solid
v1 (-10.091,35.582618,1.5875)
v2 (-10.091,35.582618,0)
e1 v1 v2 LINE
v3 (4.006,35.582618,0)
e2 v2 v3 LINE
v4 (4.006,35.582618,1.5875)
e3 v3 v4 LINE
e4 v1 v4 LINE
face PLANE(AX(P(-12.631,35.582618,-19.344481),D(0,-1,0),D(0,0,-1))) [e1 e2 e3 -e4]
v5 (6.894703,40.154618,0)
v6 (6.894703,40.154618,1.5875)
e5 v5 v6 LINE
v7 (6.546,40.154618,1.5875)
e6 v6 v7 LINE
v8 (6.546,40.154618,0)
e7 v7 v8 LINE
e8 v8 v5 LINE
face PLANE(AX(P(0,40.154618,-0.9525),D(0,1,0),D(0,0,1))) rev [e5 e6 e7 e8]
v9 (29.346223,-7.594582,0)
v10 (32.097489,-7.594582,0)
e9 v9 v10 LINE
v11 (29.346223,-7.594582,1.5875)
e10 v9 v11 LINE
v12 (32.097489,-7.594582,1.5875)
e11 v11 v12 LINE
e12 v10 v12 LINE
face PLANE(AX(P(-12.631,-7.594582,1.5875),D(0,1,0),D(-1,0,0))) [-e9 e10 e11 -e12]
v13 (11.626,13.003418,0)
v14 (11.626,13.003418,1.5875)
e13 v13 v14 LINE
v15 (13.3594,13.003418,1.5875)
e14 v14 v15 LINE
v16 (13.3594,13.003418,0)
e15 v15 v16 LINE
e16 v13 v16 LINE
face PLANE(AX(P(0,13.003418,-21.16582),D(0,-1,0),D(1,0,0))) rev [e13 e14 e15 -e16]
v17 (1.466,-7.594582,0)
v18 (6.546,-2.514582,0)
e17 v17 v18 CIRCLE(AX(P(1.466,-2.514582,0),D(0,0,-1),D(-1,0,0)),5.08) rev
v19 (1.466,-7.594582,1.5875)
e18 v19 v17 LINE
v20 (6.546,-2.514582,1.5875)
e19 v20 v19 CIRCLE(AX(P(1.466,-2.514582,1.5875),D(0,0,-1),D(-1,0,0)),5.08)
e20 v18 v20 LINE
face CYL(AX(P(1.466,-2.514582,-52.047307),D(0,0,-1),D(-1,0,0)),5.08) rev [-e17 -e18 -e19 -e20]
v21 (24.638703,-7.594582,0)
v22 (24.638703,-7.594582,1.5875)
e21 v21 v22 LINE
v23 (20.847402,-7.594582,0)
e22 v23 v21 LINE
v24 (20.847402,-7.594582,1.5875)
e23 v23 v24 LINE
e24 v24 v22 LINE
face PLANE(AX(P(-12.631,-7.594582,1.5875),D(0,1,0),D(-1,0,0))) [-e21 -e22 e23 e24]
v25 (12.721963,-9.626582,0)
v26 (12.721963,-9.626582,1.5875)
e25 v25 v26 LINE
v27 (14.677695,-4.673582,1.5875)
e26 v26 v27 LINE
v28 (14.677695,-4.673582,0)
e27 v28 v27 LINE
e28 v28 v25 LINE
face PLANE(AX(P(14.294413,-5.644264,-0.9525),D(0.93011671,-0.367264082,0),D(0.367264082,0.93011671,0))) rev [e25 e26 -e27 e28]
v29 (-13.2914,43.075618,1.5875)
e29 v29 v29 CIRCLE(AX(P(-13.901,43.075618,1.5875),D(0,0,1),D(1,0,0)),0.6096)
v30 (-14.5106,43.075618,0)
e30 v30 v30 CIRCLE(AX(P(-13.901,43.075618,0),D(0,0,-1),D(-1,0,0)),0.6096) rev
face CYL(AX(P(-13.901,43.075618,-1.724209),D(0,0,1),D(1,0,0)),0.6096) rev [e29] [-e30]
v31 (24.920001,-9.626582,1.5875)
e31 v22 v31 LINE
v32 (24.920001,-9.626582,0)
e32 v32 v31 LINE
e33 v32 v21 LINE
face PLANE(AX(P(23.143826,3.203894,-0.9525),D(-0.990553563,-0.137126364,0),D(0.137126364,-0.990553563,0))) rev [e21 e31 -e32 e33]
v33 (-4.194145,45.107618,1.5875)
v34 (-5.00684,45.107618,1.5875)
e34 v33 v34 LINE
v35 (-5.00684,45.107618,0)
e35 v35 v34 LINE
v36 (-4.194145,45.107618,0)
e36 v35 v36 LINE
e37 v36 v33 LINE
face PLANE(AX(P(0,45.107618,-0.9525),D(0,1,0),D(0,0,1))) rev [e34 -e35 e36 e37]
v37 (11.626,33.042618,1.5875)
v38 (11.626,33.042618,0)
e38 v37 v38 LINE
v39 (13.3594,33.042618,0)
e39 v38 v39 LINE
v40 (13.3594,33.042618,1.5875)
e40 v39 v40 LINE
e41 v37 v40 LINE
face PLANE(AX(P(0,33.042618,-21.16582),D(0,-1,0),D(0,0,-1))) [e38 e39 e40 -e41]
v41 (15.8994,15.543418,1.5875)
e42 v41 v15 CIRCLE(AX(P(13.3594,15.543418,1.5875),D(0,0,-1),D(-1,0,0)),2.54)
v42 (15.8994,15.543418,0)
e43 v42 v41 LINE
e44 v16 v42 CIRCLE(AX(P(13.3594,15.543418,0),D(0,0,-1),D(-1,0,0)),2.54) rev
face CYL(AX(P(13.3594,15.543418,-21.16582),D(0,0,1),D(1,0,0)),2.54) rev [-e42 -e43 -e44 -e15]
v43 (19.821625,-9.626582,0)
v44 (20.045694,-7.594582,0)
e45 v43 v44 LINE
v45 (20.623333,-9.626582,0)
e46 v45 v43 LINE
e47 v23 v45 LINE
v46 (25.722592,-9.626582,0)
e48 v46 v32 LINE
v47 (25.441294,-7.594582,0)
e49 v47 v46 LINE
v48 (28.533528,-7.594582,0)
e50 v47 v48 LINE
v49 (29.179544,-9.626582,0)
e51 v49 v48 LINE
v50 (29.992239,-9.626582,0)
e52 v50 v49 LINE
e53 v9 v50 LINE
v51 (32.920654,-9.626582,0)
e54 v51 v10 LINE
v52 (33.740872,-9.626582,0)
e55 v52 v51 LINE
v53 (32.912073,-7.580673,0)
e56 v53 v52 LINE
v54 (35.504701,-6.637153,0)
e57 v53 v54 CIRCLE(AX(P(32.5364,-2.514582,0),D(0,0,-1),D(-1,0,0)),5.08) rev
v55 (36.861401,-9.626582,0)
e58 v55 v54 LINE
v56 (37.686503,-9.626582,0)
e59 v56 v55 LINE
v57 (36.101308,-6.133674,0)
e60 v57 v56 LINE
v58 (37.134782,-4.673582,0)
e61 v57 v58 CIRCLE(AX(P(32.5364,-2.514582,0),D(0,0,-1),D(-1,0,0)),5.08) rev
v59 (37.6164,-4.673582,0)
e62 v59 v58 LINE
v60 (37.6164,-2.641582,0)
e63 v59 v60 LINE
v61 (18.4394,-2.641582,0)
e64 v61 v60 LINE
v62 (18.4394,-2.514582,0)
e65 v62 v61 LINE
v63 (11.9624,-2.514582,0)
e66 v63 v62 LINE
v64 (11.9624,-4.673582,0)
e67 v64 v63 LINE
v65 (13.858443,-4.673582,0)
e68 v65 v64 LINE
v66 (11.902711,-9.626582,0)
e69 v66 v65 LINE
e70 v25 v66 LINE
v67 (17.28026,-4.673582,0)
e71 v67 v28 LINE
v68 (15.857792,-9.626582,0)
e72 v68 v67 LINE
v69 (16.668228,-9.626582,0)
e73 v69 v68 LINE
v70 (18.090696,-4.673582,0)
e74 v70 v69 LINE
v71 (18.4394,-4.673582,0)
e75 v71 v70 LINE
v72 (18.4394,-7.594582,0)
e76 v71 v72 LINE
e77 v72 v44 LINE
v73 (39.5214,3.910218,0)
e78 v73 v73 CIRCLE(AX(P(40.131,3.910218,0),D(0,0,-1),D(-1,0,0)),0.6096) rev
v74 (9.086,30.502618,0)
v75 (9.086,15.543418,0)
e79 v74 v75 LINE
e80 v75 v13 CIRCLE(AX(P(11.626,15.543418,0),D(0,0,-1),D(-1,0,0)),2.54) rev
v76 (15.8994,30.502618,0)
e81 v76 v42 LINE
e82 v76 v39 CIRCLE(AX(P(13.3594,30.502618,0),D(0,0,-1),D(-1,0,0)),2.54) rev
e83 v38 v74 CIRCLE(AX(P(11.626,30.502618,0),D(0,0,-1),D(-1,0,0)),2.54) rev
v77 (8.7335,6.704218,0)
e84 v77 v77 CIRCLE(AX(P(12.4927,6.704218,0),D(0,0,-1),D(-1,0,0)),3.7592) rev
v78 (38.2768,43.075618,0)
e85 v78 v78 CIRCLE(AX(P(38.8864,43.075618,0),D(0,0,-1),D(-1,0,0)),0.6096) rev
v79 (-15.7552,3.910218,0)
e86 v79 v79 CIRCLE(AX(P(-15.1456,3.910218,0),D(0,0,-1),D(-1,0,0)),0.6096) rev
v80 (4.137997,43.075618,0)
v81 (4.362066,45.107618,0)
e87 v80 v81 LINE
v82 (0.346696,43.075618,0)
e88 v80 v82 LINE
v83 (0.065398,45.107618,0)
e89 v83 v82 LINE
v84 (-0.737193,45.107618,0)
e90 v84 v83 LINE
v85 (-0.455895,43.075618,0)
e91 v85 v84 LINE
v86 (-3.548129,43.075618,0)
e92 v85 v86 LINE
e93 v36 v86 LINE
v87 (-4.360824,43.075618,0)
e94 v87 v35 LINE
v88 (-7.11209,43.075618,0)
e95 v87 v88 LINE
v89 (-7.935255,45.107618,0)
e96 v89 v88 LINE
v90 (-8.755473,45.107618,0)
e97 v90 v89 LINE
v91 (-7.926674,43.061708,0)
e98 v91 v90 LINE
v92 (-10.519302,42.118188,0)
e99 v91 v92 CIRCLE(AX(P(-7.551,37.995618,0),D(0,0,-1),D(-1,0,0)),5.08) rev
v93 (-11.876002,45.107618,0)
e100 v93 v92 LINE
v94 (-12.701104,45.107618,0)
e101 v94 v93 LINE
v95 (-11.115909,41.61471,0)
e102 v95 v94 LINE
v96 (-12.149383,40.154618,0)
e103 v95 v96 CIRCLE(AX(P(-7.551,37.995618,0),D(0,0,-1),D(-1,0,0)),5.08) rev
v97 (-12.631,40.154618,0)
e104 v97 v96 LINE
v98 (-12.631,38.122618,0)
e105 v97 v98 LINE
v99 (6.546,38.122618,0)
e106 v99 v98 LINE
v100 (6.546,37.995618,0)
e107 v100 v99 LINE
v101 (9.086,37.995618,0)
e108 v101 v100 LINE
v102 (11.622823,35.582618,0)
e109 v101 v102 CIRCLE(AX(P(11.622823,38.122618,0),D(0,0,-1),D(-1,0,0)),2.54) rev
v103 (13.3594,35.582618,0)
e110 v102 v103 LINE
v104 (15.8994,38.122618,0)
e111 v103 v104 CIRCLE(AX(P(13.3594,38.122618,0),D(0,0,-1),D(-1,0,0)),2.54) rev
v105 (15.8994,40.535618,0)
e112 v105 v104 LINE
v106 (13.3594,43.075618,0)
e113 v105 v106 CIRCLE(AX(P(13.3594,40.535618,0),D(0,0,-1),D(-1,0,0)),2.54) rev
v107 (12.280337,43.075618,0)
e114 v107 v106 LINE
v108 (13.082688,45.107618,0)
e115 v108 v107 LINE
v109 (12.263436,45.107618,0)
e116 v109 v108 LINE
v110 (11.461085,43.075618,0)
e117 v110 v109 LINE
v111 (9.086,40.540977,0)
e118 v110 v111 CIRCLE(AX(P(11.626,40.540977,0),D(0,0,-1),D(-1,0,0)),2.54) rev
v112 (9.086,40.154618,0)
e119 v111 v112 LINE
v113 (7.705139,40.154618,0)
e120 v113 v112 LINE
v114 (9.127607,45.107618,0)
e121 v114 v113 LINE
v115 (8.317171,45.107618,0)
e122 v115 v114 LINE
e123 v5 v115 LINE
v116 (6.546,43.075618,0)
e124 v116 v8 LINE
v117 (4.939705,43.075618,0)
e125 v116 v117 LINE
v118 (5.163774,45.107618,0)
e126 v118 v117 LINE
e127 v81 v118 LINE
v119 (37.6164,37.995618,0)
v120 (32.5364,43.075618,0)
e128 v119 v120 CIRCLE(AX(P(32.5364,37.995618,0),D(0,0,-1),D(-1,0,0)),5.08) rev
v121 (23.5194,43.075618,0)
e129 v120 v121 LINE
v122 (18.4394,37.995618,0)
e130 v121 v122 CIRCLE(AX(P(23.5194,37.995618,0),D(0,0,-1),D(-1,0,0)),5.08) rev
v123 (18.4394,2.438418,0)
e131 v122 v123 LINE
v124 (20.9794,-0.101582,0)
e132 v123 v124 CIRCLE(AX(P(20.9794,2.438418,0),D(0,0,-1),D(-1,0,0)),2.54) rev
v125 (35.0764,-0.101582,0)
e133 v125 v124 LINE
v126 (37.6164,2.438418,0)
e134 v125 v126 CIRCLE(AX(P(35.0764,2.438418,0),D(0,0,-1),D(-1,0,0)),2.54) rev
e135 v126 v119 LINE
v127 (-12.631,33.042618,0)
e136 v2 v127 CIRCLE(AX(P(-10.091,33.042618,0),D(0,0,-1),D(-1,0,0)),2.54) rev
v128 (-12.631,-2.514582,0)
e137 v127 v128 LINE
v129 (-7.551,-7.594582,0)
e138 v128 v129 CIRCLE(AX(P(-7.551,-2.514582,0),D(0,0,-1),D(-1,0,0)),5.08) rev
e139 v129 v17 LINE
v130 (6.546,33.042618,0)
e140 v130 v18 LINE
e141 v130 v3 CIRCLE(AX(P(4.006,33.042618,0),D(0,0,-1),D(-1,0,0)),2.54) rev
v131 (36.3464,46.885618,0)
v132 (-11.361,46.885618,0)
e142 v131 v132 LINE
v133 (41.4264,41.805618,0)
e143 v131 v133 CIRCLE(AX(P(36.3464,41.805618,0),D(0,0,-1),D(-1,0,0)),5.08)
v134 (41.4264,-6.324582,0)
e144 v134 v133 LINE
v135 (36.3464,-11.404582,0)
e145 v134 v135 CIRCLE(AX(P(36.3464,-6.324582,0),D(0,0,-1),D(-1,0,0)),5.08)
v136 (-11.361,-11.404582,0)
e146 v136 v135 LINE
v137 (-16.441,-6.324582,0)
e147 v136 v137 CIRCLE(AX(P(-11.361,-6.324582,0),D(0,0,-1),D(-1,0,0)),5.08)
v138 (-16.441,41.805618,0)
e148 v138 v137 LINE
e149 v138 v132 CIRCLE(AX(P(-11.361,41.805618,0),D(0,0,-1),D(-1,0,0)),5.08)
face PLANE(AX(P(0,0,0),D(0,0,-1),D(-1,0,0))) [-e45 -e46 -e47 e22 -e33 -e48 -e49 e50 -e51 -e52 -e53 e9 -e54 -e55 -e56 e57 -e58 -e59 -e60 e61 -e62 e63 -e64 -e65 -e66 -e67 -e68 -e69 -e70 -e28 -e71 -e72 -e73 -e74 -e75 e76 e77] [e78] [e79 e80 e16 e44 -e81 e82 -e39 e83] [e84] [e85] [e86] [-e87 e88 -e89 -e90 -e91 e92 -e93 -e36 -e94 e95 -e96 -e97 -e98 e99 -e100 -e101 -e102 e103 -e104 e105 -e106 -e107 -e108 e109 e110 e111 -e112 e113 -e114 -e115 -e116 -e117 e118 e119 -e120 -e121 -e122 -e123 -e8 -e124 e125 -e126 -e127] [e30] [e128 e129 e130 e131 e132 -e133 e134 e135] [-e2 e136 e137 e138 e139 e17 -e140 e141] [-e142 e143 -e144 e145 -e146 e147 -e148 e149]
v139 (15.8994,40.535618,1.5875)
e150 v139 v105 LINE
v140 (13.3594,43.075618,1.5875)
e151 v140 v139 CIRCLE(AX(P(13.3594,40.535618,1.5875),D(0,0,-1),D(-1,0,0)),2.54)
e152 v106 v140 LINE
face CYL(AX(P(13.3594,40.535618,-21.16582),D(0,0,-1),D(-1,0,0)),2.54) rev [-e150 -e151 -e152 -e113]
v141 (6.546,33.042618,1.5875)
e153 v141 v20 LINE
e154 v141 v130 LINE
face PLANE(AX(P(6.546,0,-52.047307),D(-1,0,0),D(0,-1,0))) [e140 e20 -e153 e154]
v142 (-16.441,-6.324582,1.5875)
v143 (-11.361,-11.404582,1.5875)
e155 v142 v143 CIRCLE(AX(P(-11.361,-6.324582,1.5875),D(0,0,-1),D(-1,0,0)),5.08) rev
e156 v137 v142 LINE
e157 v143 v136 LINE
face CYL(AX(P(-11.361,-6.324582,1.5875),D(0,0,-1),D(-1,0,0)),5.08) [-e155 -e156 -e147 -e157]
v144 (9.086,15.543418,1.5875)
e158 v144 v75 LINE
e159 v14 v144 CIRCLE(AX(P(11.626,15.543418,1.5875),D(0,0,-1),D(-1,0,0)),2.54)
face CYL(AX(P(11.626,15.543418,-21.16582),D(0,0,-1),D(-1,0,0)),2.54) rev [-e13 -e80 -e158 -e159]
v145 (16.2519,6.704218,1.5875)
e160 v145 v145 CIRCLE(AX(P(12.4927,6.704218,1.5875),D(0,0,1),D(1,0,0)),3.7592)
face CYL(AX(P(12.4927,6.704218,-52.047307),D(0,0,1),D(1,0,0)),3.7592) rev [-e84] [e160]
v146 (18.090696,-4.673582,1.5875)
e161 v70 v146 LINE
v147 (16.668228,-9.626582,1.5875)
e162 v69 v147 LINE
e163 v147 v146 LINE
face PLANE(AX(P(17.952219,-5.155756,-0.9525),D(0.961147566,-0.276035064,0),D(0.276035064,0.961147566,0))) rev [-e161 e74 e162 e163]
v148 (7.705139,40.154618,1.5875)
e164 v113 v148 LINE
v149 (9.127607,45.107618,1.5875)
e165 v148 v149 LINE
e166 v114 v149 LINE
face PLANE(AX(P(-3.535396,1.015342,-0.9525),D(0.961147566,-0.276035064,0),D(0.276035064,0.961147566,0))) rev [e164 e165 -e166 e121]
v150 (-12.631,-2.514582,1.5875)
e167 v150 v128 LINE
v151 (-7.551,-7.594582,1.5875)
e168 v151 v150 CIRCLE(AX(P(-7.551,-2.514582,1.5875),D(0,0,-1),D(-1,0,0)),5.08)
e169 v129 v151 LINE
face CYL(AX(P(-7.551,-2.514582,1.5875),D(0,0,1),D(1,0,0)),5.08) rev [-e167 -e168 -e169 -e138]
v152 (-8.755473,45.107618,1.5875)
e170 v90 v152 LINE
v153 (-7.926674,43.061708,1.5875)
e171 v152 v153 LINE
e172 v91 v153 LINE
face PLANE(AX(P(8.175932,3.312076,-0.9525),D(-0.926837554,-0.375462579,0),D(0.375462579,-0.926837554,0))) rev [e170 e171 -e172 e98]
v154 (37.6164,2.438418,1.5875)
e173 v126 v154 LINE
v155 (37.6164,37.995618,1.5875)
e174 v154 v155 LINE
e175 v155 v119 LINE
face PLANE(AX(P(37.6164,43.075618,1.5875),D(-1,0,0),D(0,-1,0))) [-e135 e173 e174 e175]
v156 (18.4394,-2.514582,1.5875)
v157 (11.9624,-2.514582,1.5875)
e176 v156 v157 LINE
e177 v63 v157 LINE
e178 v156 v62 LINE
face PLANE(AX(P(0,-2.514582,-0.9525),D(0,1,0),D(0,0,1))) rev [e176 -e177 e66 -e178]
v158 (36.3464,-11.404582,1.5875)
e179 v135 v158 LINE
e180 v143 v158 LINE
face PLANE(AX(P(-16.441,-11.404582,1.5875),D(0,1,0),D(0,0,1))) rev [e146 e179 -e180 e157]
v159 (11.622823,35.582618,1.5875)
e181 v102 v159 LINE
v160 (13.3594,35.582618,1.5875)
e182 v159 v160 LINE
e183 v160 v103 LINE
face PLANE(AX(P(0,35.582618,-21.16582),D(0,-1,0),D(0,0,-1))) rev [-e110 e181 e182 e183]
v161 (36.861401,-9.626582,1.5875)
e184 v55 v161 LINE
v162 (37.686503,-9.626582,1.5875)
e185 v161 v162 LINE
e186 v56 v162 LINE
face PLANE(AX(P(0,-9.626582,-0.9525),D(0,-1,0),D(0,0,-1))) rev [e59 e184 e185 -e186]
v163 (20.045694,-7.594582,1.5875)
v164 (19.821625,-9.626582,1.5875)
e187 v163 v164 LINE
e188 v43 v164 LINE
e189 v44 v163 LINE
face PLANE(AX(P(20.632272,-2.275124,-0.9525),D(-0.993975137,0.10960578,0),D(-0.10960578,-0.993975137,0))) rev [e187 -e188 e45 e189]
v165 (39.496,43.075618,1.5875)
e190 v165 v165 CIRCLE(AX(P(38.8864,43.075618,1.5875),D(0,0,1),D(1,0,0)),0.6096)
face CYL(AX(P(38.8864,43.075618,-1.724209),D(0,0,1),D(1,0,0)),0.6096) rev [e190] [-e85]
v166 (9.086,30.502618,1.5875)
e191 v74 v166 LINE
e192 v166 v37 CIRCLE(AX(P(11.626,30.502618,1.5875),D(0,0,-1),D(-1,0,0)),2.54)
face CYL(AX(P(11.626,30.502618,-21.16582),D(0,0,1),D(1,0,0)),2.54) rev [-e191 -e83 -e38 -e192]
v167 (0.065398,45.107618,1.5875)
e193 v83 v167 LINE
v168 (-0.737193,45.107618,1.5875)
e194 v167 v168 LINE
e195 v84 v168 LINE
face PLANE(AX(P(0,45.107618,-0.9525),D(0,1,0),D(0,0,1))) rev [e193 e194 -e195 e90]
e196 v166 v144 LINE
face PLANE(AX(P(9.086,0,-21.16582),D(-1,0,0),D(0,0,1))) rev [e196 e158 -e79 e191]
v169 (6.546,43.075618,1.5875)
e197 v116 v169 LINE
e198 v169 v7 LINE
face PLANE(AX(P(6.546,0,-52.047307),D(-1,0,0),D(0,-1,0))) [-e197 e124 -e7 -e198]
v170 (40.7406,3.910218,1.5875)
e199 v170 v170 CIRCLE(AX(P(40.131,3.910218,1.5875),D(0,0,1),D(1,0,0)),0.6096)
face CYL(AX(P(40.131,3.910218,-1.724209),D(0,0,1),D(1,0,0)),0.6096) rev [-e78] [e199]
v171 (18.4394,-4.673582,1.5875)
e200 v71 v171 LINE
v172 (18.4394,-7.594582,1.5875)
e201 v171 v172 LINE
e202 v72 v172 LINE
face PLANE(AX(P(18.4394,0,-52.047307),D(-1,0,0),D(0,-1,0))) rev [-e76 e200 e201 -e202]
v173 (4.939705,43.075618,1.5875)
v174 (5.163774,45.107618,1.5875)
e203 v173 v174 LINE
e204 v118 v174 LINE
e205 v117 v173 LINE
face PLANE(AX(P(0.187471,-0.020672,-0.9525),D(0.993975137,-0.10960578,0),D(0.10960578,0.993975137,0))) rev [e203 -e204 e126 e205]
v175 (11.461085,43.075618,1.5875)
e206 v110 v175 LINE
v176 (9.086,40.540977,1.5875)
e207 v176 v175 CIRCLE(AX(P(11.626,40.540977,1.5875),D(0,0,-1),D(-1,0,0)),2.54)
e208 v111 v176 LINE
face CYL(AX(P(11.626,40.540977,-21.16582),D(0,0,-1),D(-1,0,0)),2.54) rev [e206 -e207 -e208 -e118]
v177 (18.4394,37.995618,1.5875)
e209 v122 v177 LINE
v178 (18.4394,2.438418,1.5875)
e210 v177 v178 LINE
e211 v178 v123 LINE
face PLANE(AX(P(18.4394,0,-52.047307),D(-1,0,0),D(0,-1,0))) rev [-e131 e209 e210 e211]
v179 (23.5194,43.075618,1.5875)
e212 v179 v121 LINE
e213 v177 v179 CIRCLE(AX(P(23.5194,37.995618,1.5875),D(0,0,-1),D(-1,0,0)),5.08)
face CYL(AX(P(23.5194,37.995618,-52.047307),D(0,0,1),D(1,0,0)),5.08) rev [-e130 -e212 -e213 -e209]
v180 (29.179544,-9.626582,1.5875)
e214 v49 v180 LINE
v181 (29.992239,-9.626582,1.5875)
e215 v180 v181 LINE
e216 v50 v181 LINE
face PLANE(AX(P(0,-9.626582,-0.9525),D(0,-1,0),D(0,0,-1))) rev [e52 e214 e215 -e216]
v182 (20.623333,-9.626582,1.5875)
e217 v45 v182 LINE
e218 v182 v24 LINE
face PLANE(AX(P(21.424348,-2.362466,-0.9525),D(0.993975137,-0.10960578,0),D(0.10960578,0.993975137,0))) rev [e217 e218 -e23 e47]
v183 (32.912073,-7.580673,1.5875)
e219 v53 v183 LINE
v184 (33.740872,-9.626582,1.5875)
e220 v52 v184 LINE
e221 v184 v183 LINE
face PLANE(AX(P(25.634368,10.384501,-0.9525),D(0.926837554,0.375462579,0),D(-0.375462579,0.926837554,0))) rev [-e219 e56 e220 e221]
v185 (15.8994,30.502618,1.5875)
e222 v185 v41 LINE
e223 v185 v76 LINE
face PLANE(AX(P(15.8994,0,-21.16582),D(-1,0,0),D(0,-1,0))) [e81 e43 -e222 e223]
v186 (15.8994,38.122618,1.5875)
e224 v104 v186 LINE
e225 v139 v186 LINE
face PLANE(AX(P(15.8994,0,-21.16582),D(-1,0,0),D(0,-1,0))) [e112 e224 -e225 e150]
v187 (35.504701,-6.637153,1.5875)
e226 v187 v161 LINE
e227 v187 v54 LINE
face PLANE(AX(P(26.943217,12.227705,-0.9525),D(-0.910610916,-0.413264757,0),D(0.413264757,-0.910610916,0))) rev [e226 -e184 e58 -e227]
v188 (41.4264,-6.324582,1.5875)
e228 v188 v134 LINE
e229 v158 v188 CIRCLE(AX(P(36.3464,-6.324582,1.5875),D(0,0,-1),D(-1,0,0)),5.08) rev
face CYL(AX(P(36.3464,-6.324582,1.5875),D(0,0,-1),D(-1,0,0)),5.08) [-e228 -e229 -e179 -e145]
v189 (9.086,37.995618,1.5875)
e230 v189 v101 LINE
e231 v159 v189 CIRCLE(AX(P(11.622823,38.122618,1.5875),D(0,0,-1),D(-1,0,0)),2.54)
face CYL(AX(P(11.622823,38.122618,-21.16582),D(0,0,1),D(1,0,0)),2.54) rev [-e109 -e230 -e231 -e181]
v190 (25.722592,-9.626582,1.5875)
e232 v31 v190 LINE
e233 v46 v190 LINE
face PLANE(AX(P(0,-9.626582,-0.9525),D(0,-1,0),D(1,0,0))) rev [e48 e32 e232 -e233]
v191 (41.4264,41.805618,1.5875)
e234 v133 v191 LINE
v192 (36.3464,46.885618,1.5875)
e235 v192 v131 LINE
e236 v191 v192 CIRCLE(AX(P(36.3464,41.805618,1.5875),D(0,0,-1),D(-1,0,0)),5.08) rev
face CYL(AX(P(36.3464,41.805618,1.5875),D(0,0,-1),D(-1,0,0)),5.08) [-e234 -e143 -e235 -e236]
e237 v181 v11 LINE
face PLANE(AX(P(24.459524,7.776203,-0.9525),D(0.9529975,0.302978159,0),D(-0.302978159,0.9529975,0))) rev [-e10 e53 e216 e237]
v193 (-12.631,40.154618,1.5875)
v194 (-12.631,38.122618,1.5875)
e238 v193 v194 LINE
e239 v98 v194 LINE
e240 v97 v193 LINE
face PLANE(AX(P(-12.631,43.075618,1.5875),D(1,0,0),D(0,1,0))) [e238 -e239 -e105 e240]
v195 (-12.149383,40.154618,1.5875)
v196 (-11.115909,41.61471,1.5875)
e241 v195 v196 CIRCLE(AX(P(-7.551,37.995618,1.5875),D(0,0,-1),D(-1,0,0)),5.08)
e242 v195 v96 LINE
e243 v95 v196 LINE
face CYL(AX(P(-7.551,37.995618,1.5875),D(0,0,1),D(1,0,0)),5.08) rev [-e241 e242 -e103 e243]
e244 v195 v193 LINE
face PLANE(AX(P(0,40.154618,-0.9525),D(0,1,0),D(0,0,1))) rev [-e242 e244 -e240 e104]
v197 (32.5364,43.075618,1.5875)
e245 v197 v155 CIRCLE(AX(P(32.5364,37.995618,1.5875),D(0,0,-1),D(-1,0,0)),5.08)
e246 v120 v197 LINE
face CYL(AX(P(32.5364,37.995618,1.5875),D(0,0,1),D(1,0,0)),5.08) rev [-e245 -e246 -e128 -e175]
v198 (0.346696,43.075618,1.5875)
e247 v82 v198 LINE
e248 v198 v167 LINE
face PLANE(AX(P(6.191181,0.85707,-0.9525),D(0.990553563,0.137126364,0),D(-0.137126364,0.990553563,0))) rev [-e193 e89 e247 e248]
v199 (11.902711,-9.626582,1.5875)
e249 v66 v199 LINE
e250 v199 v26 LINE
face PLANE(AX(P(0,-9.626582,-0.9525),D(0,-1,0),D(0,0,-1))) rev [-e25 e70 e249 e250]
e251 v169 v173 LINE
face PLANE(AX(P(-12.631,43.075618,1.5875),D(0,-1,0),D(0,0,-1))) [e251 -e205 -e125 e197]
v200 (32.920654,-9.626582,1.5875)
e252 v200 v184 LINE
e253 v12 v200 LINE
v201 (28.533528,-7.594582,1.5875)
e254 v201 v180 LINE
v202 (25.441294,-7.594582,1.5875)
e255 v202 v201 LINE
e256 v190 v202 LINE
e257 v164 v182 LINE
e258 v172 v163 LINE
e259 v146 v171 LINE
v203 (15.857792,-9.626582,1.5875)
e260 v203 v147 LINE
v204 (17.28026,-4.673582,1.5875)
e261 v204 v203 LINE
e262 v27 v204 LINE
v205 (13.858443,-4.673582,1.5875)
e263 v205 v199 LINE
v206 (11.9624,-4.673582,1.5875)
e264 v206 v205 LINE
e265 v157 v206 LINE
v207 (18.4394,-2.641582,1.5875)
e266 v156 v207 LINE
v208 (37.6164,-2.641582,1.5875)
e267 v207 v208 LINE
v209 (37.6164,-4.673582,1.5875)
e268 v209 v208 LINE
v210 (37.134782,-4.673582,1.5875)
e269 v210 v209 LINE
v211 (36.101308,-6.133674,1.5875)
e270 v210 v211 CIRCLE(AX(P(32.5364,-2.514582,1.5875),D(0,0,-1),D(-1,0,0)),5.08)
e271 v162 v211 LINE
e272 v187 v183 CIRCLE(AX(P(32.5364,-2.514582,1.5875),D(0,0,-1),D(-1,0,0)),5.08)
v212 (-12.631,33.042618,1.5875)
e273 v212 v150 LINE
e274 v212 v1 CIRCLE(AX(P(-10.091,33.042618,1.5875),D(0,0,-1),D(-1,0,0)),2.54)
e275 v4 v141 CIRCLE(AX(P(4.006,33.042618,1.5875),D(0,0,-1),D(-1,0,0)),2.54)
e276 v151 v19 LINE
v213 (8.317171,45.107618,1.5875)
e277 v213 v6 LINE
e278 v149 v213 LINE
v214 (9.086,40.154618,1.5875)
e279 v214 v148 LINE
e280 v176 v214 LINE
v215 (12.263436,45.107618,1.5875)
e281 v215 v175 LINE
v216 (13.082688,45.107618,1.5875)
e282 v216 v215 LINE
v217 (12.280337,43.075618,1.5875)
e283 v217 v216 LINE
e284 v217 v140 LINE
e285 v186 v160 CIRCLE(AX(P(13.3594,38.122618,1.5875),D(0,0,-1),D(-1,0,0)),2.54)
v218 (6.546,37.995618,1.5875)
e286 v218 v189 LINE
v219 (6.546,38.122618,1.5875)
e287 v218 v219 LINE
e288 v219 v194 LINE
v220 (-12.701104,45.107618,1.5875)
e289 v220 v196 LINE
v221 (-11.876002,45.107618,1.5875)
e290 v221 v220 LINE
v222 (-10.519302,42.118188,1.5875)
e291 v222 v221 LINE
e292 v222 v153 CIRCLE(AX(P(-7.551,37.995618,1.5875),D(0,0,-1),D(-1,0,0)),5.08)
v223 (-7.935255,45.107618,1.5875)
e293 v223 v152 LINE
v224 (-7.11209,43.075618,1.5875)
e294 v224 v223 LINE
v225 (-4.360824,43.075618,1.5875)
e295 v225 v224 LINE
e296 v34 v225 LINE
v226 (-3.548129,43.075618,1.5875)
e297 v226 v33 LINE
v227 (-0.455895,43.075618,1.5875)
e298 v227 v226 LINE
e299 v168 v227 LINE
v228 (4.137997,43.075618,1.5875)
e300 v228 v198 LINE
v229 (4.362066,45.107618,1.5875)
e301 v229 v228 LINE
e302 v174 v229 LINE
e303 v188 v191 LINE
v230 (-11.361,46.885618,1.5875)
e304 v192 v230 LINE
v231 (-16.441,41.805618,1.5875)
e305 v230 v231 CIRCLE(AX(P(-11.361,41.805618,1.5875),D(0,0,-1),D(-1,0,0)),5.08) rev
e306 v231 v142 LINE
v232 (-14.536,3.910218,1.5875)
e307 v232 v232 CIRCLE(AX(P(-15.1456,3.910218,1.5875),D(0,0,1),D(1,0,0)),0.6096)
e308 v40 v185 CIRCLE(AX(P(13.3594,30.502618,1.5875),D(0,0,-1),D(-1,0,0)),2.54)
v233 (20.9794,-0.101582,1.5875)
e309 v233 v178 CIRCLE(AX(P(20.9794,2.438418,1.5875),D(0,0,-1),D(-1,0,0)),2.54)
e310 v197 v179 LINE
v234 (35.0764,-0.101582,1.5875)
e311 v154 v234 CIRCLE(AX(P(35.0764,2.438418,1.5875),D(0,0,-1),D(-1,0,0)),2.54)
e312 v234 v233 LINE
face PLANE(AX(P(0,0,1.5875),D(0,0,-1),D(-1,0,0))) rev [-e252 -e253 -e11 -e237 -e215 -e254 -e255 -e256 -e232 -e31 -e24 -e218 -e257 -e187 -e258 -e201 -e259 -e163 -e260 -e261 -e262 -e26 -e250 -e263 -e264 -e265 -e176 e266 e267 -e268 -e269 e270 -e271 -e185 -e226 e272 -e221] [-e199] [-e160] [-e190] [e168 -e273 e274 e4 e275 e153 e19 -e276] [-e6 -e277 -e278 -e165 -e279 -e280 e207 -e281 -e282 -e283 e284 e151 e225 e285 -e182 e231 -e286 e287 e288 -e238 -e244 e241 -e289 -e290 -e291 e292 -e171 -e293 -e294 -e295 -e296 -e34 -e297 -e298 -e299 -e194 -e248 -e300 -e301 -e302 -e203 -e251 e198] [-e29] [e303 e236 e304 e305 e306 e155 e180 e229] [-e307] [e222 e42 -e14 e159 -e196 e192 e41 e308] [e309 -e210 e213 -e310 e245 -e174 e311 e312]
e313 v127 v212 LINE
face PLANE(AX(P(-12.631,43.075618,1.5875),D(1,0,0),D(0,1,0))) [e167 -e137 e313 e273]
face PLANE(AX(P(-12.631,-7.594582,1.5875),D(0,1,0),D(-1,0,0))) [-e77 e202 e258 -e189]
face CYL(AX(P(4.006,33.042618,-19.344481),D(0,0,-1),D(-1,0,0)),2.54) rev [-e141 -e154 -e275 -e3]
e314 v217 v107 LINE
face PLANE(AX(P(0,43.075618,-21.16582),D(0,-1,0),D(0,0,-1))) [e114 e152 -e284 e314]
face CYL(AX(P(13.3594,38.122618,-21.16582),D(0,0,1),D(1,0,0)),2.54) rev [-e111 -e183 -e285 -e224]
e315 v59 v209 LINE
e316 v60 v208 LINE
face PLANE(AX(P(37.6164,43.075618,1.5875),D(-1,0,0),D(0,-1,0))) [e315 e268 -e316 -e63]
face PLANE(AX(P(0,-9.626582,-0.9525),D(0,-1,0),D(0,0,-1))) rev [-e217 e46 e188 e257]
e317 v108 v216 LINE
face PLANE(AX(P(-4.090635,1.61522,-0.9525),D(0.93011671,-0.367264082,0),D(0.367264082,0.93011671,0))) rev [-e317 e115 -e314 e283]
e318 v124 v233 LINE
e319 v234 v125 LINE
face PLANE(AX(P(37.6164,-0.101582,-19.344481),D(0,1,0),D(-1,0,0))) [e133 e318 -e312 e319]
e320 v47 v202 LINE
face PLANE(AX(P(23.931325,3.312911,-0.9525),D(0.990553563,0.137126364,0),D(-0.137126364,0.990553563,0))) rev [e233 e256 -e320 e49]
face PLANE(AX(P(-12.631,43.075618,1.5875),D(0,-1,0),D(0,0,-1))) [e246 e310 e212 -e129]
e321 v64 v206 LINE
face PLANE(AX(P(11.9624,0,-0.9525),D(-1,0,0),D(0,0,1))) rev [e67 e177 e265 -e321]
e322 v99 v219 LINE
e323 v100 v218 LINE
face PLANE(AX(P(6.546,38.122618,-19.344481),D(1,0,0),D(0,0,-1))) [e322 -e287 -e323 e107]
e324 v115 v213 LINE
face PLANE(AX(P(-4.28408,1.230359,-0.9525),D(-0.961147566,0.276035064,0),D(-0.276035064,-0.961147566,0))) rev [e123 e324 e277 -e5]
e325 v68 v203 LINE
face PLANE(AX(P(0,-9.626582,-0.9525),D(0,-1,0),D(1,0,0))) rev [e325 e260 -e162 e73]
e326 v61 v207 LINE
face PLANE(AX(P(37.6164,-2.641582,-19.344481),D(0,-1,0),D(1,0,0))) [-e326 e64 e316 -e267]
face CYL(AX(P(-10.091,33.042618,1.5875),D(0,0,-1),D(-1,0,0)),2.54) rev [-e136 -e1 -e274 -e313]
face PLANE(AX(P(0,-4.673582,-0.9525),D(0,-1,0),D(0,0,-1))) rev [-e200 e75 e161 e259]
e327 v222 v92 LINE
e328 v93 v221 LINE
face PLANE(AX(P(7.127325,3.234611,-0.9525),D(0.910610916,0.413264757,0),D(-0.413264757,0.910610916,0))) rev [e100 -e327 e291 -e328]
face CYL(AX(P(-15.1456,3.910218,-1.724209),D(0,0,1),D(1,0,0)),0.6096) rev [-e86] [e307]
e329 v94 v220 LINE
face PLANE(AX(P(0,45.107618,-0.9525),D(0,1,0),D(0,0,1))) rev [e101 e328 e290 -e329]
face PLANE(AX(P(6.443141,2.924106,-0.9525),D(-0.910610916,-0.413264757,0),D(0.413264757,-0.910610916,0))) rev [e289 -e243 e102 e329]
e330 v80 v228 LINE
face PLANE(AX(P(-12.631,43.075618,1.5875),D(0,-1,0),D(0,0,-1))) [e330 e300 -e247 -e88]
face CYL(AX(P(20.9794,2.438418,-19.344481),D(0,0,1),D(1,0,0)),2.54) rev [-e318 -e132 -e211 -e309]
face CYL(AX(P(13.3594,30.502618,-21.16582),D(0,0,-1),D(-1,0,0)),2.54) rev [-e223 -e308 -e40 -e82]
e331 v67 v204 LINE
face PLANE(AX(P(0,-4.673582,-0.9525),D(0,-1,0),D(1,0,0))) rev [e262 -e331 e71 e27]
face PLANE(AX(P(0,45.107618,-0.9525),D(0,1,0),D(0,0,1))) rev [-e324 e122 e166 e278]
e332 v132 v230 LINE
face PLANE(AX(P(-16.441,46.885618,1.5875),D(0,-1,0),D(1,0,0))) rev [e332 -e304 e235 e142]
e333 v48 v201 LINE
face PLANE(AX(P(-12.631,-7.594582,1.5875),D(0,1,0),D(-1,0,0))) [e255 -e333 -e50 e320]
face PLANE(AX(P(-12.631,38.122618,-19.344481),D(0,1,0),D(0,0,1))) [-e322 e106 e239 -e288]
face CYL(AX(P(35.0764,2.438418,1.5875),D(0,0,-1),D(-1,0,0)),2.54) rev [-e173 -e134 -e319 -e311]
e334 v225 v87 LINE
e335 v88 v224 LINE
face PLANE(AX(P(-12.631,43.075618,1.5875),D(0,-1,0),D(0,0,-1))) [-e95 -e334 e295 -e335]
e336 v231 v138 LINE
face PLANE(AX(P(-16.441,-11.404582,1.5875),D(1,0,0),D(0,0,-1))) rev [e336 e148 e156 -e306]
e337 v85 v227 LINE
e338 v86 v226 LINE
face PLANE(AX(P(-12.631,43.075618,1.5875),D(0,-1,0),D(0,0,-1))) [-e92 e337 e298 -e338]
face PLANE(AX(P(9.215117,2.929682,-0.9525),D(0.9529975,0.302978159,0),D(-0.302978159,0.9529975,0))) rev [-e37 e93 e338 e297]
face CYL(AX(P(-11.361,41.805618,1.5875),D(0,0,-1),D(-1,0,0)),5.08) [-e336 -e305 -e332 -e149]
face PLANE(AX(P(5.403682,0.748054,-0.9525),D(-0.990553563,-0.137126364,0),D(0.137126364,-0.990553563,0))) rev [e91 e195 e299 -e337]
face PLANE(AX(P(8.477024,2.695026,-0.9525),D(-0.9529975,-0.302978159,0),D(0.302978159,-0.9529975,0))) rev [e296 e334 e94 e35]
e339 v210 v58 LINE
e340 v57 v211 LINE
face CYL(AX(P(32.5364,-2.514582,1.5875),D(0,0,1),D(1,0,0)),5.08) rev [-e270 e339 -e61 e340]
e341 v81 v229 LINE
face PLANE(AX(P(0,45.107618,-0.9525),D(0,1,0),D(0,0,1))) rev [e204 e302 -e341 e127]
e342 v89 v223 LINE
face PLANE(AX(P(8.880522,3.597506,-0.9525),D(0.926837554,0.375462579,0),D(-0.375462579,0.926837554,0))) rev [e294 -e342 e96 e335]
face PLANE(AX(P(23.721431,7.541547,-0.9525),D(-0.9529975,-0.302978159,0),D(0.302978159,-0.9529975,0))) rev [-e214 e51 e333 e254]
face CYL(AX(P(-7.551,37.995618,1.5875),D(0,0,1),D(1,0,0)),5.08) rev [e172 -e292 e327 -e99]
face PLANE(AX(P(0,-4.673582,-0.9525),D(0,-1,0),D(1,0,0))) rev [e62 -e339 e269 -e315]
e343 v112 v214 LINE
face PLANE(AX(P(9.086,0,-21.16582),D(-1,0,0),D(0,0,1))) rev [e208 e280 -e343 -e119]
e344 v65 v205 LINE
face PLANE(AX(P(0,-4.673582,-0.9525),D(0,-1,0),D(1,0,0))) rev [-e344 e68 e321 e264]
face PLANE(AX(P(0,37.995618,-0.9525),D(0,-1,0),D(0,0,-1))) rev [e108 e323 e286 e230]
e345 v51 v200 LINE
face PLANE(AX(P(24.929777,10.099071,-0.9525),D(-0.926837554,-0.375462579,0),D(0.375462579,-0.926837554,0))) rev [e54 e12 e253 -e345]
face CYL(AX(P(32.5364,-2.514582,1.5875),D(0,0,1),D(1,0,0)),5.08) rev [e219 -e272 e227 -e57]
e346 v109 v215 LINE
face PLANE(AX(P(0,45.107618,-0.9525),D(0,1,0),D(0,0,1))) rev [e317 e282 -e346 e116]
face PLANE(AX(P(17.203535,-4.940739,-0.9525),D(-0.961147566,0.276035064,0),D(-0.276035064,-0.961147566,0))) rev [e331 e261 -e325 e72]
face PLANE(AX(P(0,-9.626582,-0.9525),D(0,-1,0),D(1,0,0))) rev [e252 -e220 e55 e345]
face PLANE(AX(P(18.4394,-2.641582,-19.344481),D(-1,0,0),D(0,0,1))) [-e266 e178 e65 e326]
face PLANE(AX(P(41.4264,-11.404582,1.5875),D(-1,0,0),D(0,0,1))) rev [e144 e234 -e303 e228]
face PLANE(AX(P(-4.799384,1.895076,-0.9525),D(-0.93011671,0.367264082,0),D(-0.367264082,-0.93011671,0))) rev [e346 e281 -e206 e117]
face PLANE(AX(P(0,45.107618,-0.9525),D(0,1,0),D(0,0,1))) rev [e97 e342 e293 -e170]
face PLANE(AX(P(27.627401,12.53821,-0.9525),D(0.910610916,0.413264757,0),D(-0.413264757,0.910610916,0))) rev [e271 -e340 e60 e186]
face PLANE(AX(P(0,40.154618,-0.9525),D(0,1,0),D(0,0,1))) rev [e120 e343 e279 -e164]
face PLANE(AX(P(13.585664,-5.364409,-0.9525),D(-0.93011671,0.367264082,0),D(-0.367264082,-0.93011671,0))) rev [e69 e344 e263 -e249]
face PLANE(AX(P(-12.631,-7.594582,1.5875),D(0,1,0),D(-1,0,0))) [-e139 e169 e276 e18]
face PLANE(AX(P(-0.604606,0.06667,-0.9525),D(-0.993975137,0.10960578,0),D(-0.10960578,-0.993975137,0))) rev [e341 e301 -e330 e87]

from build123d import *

# Parameters (mm, degrees)
SKETCH1_W           = 57.8674
SKETCH1_H           = 58.2902
SKETCH1_W_2         = 50.2474
SKETCH1_H_2         = 50.6702
BOSS_EXTRUDE1_DEPTH = 1.5875
FILLET3_R           = 5.08
SKETCH6_W           = 11.8934
SKETCH6_H           = 50.6702
SKETCH6_R           = 3.7592
BOSS_EXTRUDE2_DEPTH = 1.5875
FINS_CUT_DEPTH      = 2.54
SKETCH7_W           = 19.177
SKETCH7_H           = 2.54
BOSS_EXTRUDE3_DEPTH = 1.5875
FILLET1_R           = 5.08
FILLET4_R           = 5.08
SKETCH8_W           = 6.8134
SKETCH8_H           = 7.493
SKETCH8_H_2         = 20.0392
CUT_EXTRUDE5_DEPTH  = 1.5875
FILLET5_R           = 2.54
FILLET6_R           = 2.54
FILLET7_R           = 2.54
SKETCH9_R           = 0.6096
CUT_EXTRUDE6_DEPTH  = 1.5875


with BuildPart() as part:
    # Sketch1 → Boss-Extrude1 (new body)
    with BuildSketch(Plane.XY):
        with Locations((12.492699517, 17.740517652)):
            Rectangle(SKETCH1_W, SKETCH1_H)
        with Locations((12.492699517, 17.740517652)):
            Rectangle(SKETCH1_W_2, SKETCH1_H_2, mode=Mode.SUBTRACT)
    extrude(amount=BOSS_EXTRUDE1_DEPTH)

    # Fillet3
    fillet3_edges = [part.edges().sort_by_distance(p)[0] for p in [
        (-12.631000483, 43.075617652, 0.79375),
        (-12.631000483, -7.594582348, 0.79375),
        (37.616399517, -7.594582348, 0.79375),
        (37.616399517, 43.075617652, 0.79375),
    ]]
    fillet(fillet3_edges, radius=FILLET3_R)

    # Sketch6 → Boss-Extrude2 (add)
    with BuildSketch(Plane.XY.offset(1.5875)):
        with Locations((12.492699517, 17.740517652)):
            Rectangle(SKETCH6_W, SKETCH6_H)
        with Locations((12.492699517, 6.704217652)):
            Circle(SKETCH6_R, mode=Mode.SUBTRACT)
    extrude(amount=-BOSS_EXTRUDE2_DEPTH)

    # Sketch4 → Fins cut (cut)
    with BuildSketch(Plane.XY.offset(1.5875)):
        with BuildLine():
            Line((-12.149382698, 40.154617652), (-12.631000483, 40.154617652))
            Line((-12.631000483, 40.154617652), (-12.631000483, 37.995617652))
            ThreePointArc((-12.631000483, 37.995617652), (-12.509134288, 39.101650731), (-12.149382698, 40.154617652))
        make_face()
        Polygon((6.545999517, 40.154617652), (6.545999517, 37.995617652), (13.022999517, 37.995617652), (13.022999517, 40.154617652), (11.126956513, 40.154617652), (13.082688495, 45.107617652), (12.263436468, 45.107617652), (10.307704486, 40.154617652), (7.705138754, 40.154617652), (9.127606772, 45.107617652), (8.317171321, 45.107617652), (6.894703303, 40.154617652), align=None)
        with BuildLine():
            Line((-12.701104011, 45.107617652), (-11.115909096, 41.614709607))
            ThreePointArc((-11.115909096, 41.614709607), (-10.827291356, 41.877926001), (-10.5193022, 42.118187835))
            Line((-10.5193022, 42.118187835), (-11.876002372, 45.107617652))
            Line((-11.876002372, 45.107617652), (-12.701104011, 45.107617652))
        make_face()
        Polygon((4.93970469, 43.075617652), (5.163773621, 45.107617652), (4.362066012, 45.107617652), (4.137997081, 43.075617652), align=None)
        Polygon((18.439399517, -2.514582348), (11.962399517, -2.514582348), (11.962399517, -4.673582348), (13.858442521, -4.673582348), (11.902710539, -9.626582348), (12.721962566, -9.626582348), (14.677694548, -4.673582348), (17.28026028, -4.673582348), (15.857792262, -9.626582348), (16.668227713, -9.626582348), (18.090695731, -4.673582348), (18.439399517, -4.673582348), align=None)
        with BuildLine():
            Line((-8.755473368, 45.107617652), (-7.926673781, 43.061707818))
            ThreePointArc((-7.926673781, 43.061707818), (-7.738965845, 43.072139003), (-7.551000483, 43.075617652))
            Line((-7.551000483, 43.075617652), (-7.112090465, 43.075617652))
            Line((-7.112090465, 43.075617652), (-7.935255168, 45.107617652))
            Line((-7.935255168, 45.107617652), (-8.755473368, 45.107617652))
        make_face()
        with BuildLine():
            Line((37.616399517, -4.673582348), (37.616399517, -2.514582348))
            ThreePointArc((37.616399517, -2.514582348), (37.494533322, -3.620615427), (37.134781733, -4.673582348))
            Line((37.134781733, -4.673582348), (37.616399517, -4.673582348))
        make_face()
        Polygon((0.346695583, 43.075617652), (0.065397546, 45.107617652), (-0.737192749, 45.107617652), (-0.455894712, 43.075617652), align=None)
        with BuildLine():
            Line((37.686503045, -9.626582348), (36.10130813, -6.133674303))
            ThreePointArc((36.10130813, -6.133674303), (35.81269039, -6.396890696), (35.504701234, -6.637152531))
            Line((35.504701234, -6.637152531), (36.861401406, -9.626582348))
            Line((36.861401406, -9.626582348), (37.686503045, -9.626582348))
        make_face()
        Polygon((20.045694344, -7.594582348), (19.821625413, -9.626582348), (20.623333022, -9.626582348), (20.847401953, -7.594582348), align=None)
        Polygon((-5.00684021, 45.107617652), (-4.360824225, 43.075617652), (-3.54812875, 43.075617652), (-4.194144736, 45.107617652), align=None)
        Polygon((24.638703451, -7.594582348), (24.920001488, -9.626582348), (25.722591783, -9.626582348), (25.441293746, -7.594582348), align=None)
        with BuildLine():
            Line((33.740872402, -9.626582348), (32.912072815, -7.580672514))
            ThreePointArc((32.912072815, -7.580672514), (32.72436488, -7.591103698), (32.536399517, -7.594582348))
            Line((32.536399517, -7.594582348), (32.097489499, -7.594582348))
            Line((32.097489499, -7.594582348), (32.920654202, -9.626582348))
            Line((32.920654202, -9.626582348), (33.740872402, -9.626582348))
        make_face()
        Polygon((28.533527785, -7.594582348), (29.17954377, -9.626582348), (29.992239244, -9.626582348), (29.346223259, -7.594582348), align=None)
    extrude(amount=-FINS_CUT_DEPTH, mode=Mode.SUBTRACT)

    # Sketch7 → Boss-Extrude3 (add)
    with BuildSketch(Plane.XY.offset(1.5875)):
        with Locations((-3.042500483, 36.852617652)):
            Rectangle(SKETCH7_W, SKETCH7_H)
        with Locations((28.027899517, -1.371582348)):
            Rectangle(SKETCH7_W, SKETCH7_H)
    extrude(amount=-BOSS_EXTRUDE3_DEPTH)

    # Fillet1
    fillet1_edges = [part.edges().sort_by_distance(p)[0] for p in [
        (-16.441000483, 46.885617652, 0.79375),
        (41.426399517, 46.885617652, 0.79375),
        (41.426399517, -11.404582348, 0.79375),
        (-16.441000483, -11.404582348, 0.79375),
    ]]
    fillet(fillet1_edges, radius=FILLET1_R)

    # Fillet4
    fillet4_edges = [part.edges().sort_by_distance(p)[0] for p in [
        (6.545999517, -7.594582348, 0.79375),
        (18.439399517, 43.075617652, 0.79375),
    ]]
    fillet(fillet4_edges, radius=FILLET4_R)

    # Sketch8 → Cut-Extrude5 (cut)
    with BuildSketch(Plane.XY.offset(1.5875)):
        with Locations((12.492699517, 39.329117652)):
            Rectangle(SKETCH8_W, SKETCH8_H)
        with Locations((12.492699517, 23.023017652)):
            Rectangle(SKETCH8_W, SKETCH8_H_2)
    extrude(amount=-CUT_EXTRUDE5_DEPTH, mode=Mode.SUBTRACT)

    # Fillet5
    # the kernel refuses this fillet: 2.54 mm, written as the material it adds along each edge
    with BuildSketch(Plane(origin=(9.085999517, 43.075617652, 1.5875), x_dir=(1, 0, 0), z_dir=(0, 0, -1))) as fillet5_piece_1:
        with BuildLine():
            CenterArc((2.54, 2.534640638), FILLET5_R, 180, 86.277337152)
            Line((0, 2.534640638), (-0.0508, 2.534640638))
            Line((-0.0508, 2.534640638), (-0.0508, 0))
            Line((-0.0508, 0), (0, -0.0508))
            ThreePointArc((0, -0.0508), (1.187542685, -0.0508), (2.371787076, -0.050692813))
            Line((2.371787076, -0.050692813), (2.375085369, 0))
        make_face()
    extrude(amount=1.5875)
    with BuildSketch(Plane(origin=(15.899399517, 43.075617652, 1.5875), x_dir=(0, -1, 0), z_dir=(0, 0, -1)), Plane(origin=(9.085999517, 13.003417652, 1.5875), x_dir=(0, 1, 0), z_dir=(0, 0, -1)), Plane(origin=(15.899399517, 13.003417652, 1.5875), x_dir=(-1, 0, 0), z_dir=(0, 0, -1))) as fillet5_piece_2:
        with BuildLine():
            CenterArc((FILLET5_R, FILLET5_R), FILLET5_R, 180, 90)
            Line((0, FILLET5_R), (-FILLET5_R * 0.02, FILLET5_R))
            Line((-FILLET5_R * 0.02, FILLET5_R), (-FILLET5_R * 0.02, -FILLET5_R * 0.02))
            Line((-FILLET5_R * 0.02, -FILLET5_R * 0.02), (FILLET5_R, -FILLET5_R * 0.02))
            Line((FILLET5_R, -FILLET5_R * 0.02), (FILLET5_R, 0))
        make_face()
    extrude(amount=1.5875)

    # Fillet6
    fillet6_edges = [part.edges().sort_by_distance(p)[0] for p in [
        (6.545999517, 35.582617652, 0.79375),
        (-12.631000483, 35.582617652, 0.79375),
        (18.439399517, -0.101582348, 0.79375),
        (37.616399517, -0.101582348, 0.79375),
    ]]
    fillet(fillet6_edges, radius=FILLET6_R)

    # Fillet7
    # the kernel refuses this fillet: 2.54 mm, written as the material it adds along each edge
    with BuildSketch(Plane(origin=(9.085999517, 35.582617652, 1.5875), x_dir=(1, 0, 0), z_dir=(0, 0, -1))) as fillet7_piece_1:
        with BuildLine():
            CenterArc((2.536823013, -2.54), FILLET7_R, 90, 87.134016017)
            Line((0, -2.413), (-0.05073646, -2.41046))
            ThreePointArc((-0.05073646, -2.41046), (-0.0508, -1.2065), (-0.0508, 0))
            Line((-0.0508, 0), (0, 0.0508))
            Line((0, 0.0508), (2.536823013, 0.0508))
            Line((2.536823013, 0.0508), (2.536823013, 0))
        make_face()
    extrude(amount=1.5875)
    with BuildSketch(Plane(origin=(15.899399517, 35.582617652, 1.5875), x_dir=(0, 1, 0), z_dir=(0, 0, -1)), Plane(origin=(15.899399517, 33.042617652, 1.5875), x_dir=(-1, 0, 0), z_dir=(0, 0, -1))) as fillet7_piece_2:
        with BuildLine():
            CenterArc((FILLET7_R, -FILLET7_R), FILLET7_R, 90, 90)
            Line((0, -FILLET7_R), (-FILLET7_R * 0.02, -FILLET7_R))
            Line((-FILLET7_R * 0.02, -FILLET7_R), (-FILLET7_R * 0.02, FILLET7_R * 0.02))
            Line((-FILLET7_R * 0.02, FILLET7_R * 0.02), (FILLET7_R, FILLET7_R * 0.02))
            Line((FILLET7_R, FILLET7_R * 0.02), (FILLET7_R, 0))
        make_face()
    extrude(amount=1.5875)
    with BuildSketch(Plane(origin=(9.085999517, 33.042617652, 1.5875), x_dir=(1, 0, 0), z_dir=(0, 0, -1))) as fillet7_piece_3:
        with BuildLine():
            CenterArc((FILLET7_R, FILLET7_R), FILLET7_R, 180, 90)
            Line((0, FILLET7_R), (-FILLET7_R * 0.02, FILLET7_R))
            Line((-FILLET7_R * 0.02, FILLET7_R), (-FILLET7_R * 0.02, -FILLET7_R * 0.02))
            Line((-FILLET7_R * 0.02, -FILLET7_R * 0.02), (FILLET7_R, -FILLET7_R * 0.02))
            Line((FILLET7_R, -FILLET7_R * 0.02), (FILLET7_R, 0))
        make_face()
    extrude(amount=1.5875)

    # Sketch9 → Cut-Extrude6 (cut)
    with BuildSketch(Plane.XY.offset(1.5875)):
        with Locations((-13.901000483, 43.075617652)):
            Circle(SKETCH9_R)
        with Locations((38.886399517, 43.075617652)):
            Circle(SKETCH9_R)
        with Locations((40.130999517, 3.910217652)):
            Circle(SKETCH9_R)
        with Locations((-15.145600483, 3.910217652)):
            Circle(SKETCH9_R)
    extrude(amount=-CUT_EXTRUDE6_DEPTH, mode=Mode.SUBTRACT)


solid = part.part
